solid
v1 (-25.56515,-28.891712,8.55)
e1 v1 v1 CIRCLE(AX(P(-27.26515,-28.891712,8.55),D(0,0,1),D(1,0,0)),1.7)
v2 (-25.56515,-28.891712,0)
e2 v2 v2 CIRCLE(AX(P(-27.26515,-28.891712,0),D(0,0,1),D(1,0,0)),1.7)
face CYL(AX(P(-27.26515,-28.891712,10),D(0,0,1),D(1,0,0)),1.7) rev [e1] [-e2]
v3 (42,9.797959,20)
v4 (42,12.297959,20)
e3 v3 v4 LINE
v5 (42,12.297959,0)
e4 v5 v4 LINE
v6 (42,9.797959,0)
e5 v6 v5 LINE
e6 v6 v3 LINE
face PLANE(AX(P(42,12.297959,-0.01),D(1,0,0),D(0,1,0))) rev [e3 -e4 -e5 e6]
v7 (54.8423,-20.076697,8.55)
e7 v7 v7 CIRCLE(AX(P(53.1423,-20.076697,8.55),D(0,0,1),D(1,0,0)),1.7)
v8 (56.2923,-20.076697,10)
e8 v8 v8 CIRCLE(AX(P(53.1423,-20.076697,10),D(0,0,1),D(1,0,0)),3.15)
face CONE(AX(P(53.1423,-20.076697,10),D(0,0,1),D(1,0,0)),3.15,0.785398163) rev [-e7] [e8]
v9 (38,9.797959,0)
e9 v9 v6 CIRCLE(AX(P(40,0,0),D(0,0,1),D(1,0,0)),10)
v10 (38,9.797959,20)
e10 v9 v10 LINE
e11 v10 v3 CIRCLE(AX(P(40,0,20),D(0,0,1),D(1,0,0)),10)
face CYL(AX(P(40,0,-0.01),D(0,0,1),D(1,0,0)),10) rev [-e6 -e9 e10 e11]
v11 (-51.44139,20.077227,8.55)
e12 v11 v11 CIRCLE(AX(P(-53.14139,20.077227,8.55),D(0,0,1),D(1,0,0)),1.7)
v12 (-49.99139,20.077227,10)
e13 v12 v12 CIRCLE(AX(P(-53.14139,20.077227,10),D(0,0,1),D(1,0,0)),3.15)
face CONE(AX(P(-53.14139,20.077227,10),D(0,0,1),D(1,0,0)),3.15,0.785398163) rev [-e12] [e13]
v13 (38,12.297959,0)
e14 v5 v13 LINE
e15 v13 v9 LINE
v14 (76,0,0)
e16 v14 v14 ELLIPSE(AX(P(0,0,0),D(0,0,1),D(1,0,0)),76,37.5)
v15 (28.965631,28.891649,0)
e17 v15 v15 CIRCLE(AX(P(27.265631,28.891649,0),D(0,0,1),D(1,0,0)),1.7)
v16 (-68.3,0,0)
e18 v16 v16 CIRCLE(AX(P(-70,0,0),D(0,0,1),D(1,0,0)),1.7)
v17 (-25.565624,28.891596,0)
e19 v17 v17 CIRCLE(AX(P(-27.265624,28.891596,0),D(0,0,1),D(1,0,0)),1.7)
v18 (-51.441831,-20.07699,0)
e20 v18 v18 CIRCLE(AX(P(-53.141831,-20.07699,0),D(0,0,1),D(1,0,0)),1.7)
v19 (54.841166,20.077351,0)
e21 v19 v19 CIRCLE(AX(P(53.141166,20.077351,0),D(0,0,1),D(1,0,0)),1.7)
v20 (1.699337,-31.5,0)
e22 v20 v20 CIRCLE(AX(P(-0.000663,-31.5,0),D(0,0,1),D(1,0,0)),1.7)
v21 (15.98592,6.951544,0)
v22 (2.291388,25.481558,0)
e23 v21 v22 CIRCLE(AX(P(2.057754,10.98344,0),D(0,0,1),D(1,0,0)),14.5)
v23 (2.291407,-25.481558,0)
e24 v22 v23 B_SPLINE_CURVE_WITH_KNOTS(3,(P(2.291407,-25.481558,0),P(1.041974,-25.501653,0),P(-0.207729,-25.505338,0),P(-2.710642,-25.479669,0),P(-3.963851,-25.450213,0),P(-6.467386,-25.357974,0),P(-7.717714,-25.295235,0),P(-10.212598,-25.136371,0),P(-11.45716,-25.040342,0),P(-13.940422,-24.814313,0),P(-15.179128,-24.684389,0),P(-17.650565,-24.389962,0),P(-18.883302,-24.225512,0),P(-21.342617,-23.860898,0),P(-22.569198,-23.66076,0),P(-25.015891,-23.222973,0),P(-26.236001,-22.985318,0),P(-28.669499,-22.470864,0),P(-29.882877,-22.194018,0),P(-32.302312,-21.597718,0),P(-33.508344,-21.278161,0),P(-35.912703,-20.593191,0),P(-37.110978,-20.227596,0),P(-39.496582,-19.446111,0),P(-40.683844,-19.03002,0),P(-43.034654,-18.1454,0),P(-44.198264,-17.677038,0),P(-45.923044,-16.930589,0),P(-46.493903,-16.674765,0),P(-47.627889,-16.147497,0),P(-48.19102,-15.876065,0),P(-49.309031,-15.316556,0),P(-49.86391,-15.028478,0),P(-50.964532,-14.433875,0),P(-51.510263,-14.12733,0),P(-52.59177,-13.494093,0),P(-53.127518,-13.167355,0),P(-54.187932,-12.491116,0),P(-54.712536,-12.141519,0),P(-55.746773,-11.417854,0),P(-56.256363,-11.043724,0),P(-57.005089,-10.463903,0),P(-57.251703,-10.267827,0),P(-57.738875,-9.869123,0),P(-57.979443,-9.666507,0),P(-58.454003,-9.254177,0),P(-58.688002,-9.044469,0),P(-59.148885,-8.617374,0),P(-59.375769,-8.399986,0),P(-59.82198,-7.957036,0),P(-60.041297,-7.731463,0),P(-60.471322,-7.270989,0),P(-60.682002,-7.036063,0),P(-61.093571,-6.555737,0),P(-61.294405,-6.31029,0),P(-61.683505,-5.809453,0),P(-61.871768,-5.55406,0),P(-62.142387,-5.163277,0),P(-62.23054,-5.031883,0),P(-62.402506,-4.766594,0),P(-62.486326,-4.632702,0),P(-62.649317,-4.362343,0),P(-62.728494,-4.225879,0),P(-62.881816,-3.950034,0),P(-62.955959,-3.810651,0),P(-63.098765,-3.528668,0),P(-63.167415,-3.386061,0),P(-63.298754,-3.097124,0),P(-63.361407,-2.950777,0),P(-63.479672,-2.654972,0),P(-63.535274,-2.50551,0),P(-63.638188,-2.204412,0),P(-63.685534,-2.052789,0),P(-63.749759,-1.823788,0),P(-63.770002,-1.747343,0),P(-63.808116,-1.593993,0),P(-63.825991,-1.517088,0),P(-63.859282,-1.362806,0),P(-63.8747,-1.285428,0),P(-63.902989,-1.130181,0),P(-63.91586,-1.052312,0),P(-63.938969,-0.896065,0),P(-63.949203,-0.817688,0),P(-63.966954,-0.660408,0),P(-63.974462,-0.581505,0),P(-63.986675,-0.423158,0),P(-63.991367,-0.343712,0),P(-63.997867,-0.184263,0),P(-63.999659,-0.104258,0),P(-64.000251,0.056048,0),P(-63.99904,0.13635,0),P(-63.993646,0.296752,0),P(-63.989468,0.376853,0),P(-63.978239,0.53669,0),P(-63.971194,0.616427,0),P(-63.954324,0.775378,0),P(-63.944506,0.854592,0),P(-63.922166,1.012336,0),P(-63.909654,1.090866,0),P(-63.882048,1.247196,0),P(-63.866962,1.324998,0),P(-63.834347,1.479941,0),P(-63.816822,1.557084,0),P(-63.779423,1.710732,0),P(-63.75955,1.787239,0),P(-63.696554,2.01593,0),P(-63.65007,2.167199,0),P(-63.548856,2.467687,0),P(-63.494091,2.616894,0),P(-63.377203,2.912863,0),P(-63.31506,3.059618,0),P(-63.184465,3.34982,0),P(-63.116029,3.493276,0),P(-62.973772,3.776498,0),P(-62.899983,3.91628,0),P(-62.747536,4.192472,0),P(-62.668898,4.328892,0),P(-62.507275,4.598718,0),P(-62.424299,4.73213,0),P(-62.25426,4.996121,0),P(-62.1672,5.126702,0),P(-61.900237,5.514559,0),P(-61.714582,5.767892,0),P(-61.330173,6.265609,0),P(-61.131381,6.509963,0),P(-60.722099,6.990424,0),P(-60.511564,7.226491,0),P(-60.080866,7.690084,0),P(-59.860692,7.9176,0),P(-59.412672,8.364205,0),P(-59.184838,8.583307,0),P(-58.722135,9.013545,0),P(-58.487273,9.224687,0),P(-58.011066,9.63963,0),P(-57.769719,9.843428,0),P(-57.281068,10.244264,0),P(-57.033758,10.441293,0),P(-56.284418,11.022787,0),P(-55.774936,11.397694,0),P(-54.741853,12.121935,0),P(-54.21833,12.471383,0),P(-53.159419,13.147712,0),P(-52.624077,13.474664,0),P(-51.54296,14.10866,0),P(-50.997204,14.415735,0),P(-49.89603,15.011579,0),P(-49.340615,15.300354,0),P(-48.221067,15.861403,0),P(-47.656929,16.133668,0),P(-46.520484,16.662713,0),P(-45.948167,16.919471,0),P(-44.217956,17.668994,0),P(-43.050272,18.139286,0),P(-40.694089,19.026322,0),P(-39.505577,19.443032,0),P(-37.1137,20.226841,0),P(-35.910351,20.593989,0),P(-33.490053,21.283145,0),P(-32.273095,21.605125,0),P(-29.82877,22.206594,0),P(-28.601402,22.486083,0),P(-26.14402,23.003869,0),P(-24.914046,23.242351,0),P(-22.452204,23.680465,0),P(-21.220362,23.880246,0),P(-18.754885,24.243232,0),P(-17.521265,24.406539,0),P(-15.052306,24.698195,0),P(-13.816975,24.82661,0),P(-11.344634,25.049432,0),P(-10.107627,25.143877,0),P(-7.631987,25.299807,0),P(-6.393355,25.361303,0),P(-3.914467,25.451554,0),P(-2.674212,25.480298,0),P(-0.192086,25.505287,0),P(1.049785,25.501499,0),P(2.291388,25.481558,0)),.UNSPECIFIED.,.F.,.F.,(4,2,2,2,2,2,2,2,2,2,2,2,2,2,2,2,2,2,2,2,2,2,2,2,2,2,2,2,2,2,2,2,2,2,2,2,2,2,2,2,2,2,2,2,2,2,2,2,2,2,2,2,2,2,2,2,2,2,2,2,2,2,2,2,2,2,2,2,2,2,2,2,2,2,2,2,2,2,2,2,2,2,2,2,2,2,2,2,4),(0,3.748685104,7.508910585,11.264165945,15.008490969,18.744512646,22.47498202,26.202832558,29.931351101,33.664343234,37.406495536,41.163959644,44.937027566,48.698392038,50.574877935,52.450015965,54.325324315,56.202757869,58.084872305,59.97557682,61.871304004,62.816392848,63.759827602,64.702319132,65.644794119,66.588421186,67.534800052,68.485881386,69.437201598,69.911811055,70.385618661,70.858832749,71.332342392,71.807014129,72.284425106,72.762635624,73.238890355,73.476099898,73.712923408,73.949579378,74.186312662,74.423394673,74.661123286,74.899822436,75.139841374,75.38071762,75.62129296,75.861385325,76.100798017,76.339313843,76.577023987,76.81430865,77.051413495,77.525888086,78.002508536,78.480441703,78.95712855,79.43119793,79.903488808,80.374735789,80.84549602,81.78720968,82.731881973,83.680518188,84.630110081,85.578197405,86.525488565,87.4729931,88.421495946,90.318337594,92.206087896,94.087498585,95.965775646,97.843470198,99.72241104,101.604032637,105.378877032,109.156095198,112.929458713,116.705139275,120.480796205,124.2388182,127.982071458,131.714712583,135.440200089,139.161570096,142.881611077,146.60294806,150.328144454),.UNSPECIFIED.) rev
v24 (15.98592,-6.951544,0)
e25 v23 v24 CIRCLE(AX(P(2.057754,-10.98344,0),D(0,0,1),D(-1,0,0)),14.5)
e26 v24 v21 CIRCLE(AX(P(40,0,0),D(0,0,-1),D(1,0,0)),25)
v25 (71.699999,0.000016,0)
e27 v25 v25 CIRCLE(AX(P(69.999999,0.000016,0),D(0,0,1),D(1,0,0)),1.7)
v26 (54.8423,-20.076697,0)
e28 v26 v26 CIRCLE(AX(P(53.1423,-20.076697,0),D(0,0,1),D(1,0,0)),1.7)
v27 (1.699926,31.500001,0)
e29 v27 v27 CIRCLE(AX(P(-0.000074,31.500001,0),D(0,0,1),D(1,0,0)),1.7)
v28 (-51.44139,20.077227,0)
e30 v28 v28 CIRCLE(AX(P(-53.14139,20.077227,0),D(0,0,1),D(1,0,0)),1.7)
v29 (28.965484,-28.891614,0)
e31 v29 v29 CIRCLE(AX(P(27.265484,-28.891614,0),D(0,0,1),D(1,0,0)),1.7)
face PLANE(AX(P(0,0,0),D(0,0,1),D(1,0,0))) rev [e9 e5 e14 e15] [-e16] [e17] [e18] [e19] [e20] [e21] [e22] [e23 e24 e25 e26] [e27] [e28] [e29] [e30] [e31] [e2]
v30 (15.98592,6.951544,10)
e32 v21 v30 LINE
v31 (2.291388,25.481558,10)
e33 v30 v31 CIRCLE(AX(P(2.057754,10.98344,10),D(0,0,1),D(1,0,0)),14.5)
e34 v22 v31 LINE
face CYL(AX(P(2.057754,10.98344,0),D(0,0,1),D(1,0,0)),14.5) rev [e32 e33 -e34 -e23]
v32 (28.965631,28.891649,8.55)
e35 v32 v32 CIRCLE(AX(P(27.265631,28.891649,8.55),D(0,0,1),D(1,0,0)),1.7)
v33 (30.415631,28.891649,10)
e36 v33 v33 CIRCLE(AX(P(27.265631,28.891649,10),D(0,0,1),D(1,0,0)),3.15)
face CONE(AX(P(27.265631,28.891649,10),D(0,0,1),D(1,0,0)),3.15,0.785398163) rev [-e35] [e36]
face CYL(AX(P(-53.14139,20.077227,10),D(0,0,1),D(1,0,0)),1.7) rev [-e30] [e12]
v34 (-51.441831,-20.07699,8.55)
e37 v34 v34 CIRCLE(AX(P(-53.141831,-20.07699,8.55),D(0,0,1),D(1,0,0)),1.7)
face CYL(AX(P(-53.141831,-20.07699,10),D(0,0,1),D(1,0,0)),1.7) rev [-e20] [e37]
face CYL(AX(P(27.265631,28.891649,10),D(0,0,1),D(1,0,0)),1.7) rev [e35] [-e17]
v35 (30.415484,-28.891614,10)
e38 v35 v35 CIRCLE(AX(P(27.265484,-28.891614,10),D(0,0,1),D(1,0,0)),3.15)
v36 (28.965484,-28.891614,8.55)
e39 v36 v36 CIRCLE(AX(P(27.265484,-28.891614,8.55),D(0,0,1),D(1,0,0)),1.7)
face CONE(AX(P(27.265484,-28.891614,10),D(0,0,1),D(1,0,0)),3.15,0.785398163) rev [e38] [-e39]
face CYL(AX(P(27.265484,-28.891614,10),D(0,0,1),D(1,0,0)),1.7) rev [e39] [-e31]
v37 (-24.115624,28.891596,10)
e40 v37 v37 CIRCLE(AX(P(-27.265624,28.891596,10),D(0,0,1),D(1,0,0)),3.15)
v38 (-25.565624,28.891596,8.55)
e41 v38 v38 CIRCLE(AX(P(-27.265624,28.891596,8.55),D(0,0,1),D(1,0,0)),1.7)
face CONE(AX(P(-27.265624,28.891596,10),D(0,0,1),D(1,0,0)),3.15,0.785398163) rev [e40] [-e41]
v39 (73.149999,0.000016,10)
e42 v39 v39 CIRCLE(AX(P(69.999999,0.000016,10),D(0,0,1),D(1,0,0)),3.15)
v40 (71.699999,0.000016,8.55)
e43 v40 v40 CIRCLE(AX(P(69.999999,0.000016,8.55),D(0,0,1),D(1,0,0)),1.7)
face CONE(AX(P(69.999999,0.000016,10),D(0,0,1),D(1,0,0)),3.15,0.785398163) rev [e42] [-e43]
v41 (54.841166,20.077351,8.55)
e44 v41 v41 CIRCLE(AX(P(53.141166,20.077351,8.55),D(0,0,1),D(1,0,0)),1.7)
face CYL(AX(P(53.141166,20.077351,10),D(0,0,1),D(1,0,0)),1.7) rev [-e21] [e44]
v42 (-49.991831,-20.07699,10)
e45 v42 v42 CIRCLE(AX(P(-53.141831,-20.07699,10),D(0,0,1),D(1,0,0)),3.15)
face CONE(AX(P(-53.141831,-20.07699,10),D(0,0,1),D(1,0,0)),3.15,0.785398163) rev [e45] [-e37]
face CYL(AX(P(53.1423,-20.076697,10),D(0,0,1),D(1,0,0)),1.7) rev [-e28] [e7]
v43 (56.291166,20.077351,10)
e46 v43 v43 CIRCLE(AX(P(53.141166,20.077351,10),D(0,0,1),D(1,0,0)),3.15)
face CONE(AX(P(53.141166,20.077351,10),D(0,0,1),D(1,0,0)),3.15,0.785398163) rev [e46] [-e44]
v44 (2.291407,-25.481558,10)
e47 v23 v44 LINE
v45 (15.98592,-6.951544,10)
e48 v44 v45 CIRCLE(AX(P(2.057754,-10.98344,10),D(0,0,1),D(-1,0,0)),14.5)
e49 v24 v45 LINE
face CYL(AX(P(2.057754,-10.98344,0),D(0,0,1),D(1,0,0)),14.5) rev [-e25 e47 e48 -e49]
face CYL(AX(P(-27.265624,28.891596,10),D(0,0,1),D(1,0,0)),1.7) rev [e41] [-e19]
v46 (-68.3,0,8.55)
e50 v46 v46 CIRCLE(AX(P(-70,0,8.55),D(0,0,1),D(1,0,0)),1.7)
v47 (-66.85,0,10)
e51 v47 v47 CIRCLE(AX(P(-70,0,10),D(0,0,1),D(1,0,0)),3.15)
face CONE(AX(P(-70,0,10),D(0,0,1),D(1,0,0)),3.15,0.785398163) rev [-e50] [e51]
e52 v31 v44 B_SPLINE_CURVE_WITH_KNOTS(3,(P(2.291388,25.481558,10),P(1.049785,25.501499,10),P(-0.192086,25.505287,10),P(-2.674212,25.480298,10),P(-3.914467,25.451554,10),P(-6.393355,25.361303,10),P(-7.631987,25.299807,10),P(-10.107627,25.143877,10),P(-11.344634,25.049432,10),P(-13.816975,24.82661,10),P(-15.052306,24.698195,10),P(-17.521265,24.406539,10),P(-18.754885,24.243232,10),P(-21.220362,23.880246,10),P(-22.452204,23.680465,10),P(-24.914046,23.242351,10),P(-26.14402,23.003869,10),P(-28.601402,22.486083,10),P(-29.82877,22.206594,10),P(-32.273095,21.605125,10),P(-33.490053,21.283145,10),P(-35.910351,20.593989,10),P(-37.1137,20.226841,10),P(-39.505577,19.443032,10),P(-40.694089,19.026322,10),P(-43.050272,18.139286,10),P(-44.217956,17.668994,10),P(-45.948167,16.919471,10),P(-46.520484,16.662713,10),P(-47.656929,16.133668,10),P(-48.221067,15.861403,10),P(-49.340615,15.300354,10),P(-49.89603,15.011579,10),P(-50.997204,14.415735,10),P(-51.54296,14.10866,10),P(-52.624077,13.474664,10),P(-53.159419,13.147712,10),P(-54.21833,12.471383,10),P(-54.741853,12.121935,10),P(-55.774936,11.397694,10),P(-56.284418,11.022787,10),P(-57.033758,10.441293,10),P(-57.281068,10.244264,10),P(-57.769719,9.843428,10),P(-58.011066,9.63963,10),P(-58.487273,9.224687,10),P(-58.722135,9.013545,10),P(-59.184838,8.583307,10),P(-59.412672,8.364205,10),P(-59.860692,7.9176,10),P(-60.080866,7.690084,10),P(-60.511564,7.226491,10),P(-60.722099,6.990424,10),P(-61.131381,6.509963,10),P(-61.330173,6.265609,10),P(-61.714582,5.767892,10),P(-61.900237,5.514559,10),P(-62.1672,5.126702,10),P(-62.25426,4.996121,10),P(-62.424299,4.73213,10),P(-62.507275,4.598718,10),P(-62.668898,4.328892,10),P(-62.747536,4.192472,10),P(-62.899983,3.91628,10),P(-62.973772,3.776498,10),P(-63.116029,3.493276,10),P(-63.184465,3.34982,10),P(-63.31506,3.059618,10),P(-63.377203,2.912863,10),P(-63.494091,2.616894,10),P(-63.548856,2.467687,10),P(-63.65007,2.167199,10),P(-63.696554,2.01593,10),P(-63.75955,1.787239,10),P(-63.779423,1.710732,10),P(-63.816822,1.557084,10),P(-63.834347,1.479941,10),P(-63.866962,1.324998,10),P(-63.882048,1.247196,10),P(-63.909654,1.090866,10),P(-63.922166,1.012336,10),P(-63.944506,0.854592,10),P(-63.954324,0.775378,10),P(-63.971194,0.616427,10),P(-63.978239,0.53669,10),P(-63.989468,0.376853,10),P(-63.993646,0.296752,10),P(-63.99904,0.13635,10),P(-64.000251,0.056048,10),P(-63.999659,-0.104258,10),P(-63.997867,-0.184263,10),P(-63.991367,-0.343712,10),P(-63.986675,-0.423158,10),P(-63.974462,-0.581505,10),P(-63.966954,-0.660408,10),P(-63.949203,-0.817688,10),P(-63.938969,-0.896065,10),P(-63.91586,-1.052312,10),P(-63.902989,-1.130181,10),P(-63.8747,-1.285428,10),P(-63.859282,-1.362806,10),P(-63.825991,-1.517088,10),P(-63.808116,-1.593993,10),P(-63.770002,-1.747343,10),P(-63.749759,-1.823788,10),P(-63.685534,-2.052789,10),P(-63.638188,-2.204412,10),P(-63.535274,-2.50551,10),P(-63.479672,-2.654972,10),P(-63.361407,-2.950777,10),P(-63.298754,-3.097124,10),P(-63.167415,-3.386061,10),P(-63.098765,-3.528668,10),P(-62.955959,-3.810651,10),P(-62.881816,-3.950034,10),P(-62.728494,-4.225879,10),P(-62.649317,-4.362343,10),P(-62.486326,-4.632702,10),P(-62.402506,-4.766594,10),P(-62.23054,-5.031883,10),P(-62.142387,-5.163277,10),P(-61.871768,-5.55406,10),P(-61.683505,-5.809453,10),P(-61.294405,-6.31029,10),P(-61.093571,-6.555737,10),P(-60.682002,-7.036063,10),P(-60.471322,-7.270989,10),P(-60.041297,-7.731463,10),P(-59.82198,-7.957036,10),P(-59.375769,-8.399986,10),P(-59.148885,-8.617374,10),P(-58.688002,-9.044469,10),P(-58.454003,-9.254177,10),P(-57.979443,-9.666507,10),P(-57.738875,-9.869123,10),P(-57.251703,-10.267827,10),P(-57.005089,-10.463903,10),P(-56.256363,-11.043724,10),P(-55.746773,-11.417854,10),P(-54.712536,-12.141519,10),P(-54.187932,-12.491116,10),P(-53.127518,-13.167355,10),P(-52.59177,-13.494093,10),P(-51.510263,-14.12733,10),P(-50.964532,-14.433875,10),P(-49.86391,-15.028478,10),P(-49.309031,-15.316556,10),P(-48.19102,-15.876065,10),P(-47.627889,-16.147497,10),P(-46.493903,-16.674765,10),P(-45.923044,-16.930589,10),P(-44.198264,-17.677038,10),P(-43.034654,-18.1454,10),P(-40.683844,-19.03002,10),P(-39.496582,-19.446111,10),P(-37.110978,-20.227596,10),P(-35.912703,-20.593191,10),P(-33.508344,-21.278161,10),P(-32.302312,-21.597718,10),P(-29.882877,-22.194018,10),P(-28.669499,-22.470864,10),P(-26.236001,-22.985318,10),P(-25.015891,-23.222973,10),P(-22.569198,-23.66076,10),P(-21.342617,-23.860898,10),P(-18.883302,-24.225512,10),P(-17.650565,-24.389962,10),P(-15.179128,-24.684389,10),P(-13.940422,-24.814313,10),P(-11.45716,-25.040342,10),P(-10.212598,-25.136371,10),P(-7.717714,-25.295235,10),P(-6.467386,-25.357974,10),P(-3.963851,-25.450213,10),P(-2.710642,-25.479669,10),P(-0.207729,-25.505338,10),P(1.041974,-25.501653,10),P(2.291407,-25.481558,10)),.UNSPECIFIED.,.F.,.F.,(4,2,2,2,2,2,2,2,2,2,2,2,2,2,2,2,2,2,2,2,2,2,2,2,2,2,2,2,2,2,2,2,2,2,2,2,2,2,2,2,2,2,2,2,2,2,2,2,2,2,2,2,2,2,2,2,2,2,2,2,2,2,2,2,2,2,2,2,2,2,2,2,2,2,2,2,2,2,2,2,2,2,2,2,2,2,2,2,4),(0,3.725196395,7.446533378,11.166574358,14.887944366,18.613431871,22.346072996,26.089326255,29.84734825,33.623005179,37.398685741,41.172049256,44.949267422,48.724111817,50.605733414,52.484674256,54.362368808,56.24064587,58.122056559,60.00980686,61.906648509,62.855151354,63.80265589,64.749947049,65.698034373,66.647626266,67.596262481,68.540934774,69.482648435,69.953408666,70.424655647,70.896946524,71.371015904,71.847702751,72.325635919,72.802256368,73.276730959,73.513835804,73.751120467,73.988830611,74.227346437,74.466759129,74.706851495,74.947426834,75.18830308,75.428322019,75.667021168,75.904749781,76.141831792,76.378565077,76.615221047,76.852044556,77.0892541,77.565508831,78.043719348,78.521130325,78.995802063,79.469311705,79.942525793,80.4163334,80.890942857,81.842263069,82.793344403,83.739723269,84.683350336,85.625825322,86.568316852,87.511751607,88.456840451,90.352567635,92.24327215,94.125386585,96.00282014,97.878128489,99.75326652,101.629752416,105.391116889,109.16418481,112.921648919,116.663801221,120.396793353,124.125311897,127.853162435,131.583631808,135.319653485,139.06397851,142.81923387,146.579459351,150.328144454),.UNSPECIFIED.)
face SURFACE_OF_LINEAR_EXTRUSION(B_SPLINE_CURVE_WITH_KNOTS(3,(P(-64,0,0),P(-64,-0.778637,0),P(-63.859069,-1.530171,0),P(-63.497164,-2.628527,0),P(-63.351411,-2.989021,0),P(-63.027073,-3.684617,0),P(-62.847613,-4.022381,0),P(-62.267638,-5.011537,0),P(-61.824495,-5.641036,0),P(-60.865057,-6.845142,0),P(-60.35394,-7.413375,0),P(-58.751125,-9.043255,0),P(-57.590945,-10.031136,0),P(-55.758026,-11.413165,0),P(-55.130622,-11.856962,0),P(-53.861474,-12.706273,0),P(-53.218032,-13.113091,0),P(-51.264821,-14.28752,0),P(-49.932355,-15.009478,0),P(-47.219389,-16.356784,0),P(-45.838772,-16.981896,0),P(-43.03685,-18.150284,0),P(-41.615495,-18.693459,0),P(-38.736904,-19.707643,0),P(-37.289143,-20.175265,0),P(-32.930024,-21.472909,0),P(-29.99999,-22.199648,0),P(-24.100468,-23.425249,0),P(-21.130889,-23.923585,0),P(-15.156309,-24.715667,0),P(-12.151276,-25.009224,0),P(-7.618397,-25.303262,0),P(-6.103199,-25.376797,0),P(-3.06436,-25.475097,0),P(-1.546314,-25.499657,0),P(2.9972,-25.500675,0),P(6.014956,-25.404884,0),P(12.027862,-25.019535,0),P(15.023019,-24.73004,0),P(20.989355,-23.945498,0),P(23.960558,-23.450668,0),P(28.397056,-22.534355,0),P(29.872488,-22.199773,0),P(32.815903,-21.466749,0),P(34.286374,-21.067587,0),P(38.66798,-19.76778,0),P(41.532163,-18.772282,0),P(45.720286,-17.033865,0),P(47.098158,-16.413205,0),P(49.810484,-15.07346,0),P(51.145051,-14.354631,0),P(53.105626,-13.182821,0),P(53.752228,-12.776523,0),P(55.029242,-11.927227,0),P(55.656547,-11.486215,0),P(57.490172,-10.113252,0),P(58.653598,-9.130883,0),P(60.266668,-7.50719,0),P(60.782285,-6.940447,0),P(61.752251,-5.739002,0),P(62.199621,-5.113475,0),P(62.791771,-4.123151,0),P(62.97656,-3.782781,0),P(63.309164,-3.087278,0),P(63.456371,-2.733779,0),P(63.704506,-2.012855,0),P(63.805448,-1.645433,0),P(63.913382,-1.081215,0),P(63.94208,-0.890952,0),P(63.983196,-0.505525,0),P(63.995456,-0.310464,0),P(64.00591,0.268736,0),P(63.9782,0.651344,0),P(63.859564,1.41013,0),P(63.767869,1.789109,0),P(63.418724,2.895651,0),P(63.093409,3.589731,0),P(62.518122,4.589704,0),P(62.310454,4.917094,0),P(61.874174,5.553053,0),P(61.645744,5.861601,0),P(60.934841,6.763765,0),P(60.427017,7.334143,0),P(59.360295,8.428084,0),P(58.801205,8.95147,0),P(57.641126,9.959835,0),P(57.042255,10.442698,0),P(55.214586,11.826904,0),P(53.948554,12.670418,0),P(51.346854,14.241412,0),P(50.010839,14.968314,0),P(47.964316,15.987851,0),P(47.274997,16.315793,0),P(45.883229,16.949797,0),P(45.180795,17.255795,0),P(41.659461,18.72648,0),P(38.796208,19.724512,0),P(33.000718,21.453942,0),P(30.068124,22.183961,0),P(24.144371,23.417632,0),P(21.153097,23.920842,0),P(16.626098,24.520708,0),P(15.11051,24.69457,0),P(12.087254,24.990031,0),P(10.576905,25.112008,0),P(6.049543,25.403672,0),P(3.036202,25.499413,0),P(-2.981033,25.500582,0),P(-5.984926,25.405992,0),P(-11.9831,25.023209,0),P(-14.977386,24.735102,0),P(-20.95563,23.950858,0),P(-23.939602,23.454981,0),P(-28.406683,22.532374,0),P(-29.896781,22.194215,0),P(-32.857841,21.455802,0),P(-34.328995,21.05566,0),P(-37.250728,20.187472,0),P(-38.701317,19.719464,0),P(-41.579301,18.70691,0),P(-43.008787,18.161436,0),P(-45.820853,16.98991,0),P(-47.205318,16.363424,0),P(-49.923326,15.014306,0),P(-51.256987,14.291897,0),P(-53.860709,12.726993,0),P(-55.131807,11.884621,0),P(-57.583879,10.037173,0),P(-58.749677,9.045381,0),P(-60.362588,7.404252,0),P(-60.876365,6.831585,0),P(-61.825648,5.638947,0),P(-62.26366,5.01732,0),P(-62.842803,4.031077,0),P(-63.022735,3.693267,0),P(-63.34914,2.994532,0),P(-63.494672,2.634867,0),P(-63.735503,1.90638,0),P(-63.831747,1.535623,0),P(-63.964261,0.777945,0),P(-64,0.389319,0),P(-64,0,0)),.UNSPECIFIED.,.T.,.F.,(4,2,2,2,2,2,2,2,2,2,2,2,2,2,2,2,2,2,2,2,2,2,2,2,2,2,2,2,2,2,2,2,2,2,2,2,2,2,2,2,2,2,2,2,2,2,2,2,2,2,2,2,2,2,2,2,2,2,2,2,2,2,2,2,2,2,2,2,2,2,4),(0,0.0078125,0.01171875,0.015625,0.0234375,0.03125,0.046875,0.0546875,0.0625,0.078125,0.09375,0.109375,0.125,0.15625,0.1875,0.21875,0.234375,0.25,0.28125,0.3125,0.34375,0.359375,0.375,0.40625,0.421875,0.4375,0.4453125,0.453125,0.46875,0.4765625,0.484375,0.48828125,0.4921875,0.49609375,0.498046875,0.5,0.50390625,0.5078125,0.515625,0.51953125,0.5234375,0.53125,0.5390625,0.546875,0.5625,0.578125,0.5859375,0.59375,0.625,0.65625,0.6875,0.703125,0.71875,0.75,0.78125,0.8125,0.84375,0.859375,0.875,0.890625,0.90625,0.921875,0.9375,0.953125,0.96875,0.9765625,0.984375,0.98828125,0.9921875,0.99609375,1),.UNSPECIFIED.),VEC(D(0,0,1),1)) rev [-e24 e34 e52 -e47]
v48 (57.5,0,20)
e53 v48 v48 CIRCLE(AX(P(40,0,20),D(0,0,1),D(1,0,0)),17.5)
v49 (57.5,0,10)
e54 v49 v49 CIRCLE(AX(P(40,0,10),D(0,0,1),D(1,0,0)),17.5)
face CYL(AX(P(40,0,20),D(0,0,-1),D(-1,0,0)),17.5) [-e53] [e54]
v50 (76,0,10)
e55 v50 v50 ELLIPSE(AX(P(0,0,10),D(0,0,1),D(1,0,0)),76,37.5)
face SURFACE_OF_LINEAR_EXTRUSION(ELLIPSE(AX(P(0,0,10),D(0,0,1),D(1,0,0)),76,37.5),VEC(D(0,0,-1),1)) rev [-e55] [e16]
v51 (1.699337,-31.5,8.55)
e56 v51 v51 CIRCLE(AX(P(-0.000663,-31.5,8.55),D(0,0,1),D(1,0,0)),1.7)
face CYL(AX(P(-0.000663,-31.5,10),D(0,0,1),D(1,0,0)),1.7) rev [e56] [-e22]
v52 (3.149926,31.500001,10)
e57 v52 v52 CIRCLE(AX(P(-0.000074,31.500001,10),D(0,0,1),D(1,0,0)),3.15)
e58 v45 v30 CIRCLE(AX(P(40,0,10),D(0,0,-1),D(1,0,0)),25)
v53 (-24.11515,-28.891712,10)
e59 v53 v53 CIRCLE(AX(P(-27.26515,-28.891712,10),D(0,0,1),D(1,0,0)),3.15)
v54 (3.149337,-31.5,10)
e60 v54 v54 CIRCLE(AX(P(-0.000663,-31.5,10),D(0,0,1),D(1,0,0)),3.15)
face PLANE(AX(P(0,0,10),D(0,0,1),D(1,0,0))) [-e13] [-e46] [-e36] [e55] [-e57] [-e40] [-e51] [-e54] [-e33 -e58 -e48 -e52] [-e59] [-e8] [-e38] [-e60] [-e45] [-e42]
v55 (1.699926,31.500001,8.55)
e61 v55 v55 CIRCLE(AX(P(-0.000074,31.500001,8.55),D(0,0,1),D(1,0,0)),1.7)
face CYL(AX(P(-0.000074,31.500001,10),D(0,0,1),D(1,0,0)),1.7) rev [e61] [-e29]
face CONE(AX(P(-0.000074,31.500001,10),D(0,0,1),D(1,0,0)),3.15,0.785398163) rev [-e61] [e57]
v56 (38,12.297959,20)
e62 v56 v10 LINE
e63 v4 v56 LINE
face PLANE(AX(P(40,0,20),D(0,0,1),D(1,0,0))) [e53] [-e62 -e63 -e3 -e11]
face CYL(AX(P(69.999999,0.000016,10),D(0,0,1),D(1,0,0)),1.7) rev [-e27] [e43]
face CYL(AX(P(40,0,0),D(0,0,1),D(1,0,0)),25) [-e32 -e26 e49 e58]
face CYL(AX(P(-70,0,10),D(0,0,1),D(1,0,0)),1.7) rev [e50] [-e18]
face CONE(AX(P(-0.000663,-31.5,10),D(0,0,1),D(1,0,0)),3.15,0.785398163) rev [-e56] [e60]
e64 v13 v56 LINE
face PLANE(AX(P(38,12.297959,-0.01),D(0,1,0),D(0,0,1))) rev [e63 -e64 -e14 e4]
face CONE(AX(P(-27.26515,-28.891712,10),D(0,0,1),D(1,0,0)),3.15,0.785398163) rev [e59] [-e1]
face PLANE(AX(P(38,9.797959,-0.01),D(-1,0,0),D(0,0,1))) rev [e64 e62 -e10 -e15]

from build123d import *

# Parameters (mm, degrees)
SKETCH1_RX                                      = 76
SKETCH1_RY                                      = 37.5
EXTRUDE1_DEPTH                                  = 10
SKETCH2_R                                       = 17.5
EXTRUDE2_DEPTH                                  = 10
EXTRUDE3_DEPTH                                  = 86.336100216
EXTRUDE4_DEPTH                                  = 88.076116282
CSK_FOR_M3_FLAT_HEAD_MACHINE_SCREW1_D           = 3.4
CSK_FOR_M3_FLAT_HEAD_MACHINE_SCREW1_CSINK_D     = 6.3
CSK_FOR_M3_FLAT_HEAD_MACHINE_SCREW1_CSINK_ANGLE = 90


# Read off the part's stored shape, not the designer's step: CrvPattern1
with BuildPart() as part:
    # Sketch1 → Extrude1 (new body)
    with BuildSketch(Plane.XY):
        with Locations((0, 0)):
            Ellipse(SKETCH1_RX, SKETCH1_RY)
    extrude(amount=EXTRUDE1_DEPTH)

    # Sketch2 → Extrude2 (add)
    with BuildSketch(Plane.XY.offset(10)):
        with Locations((40, 0)):
            Circle(SKETCH2_R)
    extrude(amount=EXTRUDE2_DEPTH)

    # Sketch3 → Extrude3 (cut, through all)
    with BuildSketch(Plane.XY.offset(10)):
        with BuildLine():
            ThreePointArc((15.98592019, 6.951544496), (15, 3.7e-08), (15.98592017, -6.951544426))
            ThreePointArc((15.98592017, -6.951544426), (13.718784315, -19.601466006), (2.291407331, -25.481557521))
            add(Edge.make_bspline(
                [(2.29138759, 25.481557951), (1.536487696, 25.493722982), (0.781887509, 25.499850821), (-2.981033191, 25.500581652), (-5.984925899, 25.40599226), (-11.983100173, 25.023209453), (-14.977386018, 24.73510222), (-20.95563043, 23.950858112), (-23.939601905, 23.454981247), (-28.406683292, 22.532373907), (-29.89678094, 22.194215189), (-32.857840607, 21.45580248), (-34.328995491, 21.055659759), (-37.25072809, 20.187471783), (-38.70131721, 19.719464163), (-41.57930104, 18.706909763), (-43.008786731, 18.161435894), (-45.820852611, 16.989909653), (-47.205317632, 16.36342386), (-49.923326001, 15.014306389), (-51.256986979, 14.291896812), (-53.860708588, 12.726993001), (-55.131807019, 11.884621283), (-57.583878718, 10.037173385), (-58.749677002, 9.04538051), (-60.362588222, 7.404251705), (-60.876365057, 6.831585201), (-61.825648091, 5.638947207), (-62.26365963, 5.017320455), (-62.842802577, 4.031076714), (-63.022734978, 3.693267438), (-63.349140243, 2.994531599), (-63.494672168, 2.634866816), (-63.735502964, 1.90638021), (-63.831747251, 1.535622764), (-63.964260682, 0.7779445), (-64, 0.389318673), (-64, 0), (-64, -0.778637345), (-63.859069102, -1.530171415), (-63.497163716, -2.628527212), (-63.351411012, -2.989020671), (-63.027073259, -3.684617278), (-62.847612543, -4.022381244), (-62.267637767, -5.011537226), (-61.824495344, -5.641036298), (-60.865057448, -6.845142379), (-60.353939893, -7.413375257), (-58.75112499, -9.043254515), (-57.59094473, -10.031136374), (-55.758025791, -11.413165279), (-55.130622026, -11.856962148), (-53.861474171, -12.706272639), (-53.218031918, -13.113090985), (-51.264821291, -14.287519606), (-49.932355056, -15.009477583), (-47.219389061, -16.356783508), (-45.83877221, -16.981895954), (-43.036850002, -18.150283887), (-41.615494943, -18.693459408), (-38.73690368, -19.707642558), (-37.289143264, -20.175264836), (-32.930023695, -21.47290858), (-29.999989675, -22.199648454), (-24.100467658, -23.425248805), (-21.130888818, -23.923584596), (-15.156309454, -24.715666618), (-12.151276192, -25.009223767), (-7.618397002, -25.30326182), (-6.103199372, -25.376797121), (-3.064360152, -25.475096866), (-1.546314468, -25.499657235), (0.743333331, -25.500170046), (1.517739245, -25.494026052), (2.291407331, -25.481557521)],
                knots=[0.74216518, 0.74216518, 0.74216518, 0.74216518, 0.75, 0.75, 0.78125, 0.78125, 0.8125, 0.8125, 0.84375, 0.84375, 0.859375, 0.859375, 0.875, 0.875, 0.890625, 0.890625, 0.90625, 0.90625, 0.921875, 0.921875, 0.9375, 0.9375, 0.953125, 0.953125, 0.96875, 0.96875, 0.9765625, 0.9765625, 0.984375, 0.984375, 0.98828125, 0.98828125, 0.9921875, 0.9921875, 0.99609375, 0.99609375, 1, 1, 1, 1.0078125, 1.0078125, 1.01171875, 1.01171875, 1.015625, 1.015625, 1.0234375, 1.0234375, 1.03125, 1.03125, 1.046875, 1.046875, 1.0546875, 1.0546875, 1.0625, 1.0625, 1.078125, 1.078125, 1.09375, 1.09375, 1.109375, 1.109375, 1.125, 1.125, 1.15625, 1.15625, 1.1875, 1.1875, 1.21875, 1.21875, 1.234375, 1.234375, 1.25, 1.25, 1.257997075, 1.257997075, 1.257997075, 1.257997075], degree=3))
            ThreePointArc((2.29138759, 25.481557951), (13.718778483, 19.601474052), (15.98592019, 6.951544496))
        make_face()
    extrude(amount=-EXTRUDE3_DEPTH, mode=Mode.SUBTRACT)

    # Sketch4 → Extrude4 (cut, through all)
    with BuildSketch(Plane.XY.offset(20)):
        with BuildLine():
            Line((38, 9.797958971), (38, 12.297958971))
            Line((38, 12.297958971), (42, 12.297958971))
            Line((42, 12.297958971), (42, 9.797958971))
            ThreePointArc((42, 9.797958971), (40, -10), (38, 9.797958971))
        make_face()
    extrude(amount=-EXTRUDE4_DEPTH, mode=Mode.SUBTRACT)

    # CSK for M3 Flat Head Machine Screw1 (through all)
    with Locations(Plane.XY.offset(10)):
        with Locations((-70, 0)):
            CounterSinkHole(CSK_FOR_M3_FLAT_HEAD_MACHINE_SCREW1_D / 2, CSK_FOR_M3_FLAT_HEAD_MACHINE_SCREW1_CSINK_D / 2, counter_sink_angle=CSK_FOR_M3_FLAT_HEAD_MACHINE_SCREW1_CSINK_ANGLE)

    # CrvPattern1 outline → CrvPattern1 (revolve, cut)
    with BuildSketch(Plane(origin=(-53.141830984, -20.07698957, 0), x_dir=(1, 0, 0), z_dir=(0, -1, 0))):
        Polygon((0, 0), (1.7, 0), (1.7, 8.55), (3.15, 10), (0, 10), align=None)
    revolve(axis=Axis((-53.141830984, -20.07698957, 0), (0, 0, 1)), mode=Mode.SUBTRACT)

    # CrvPattern1 2 outline → CrvPattern1 2 (revolve, cut)
    with BuildSketch(Plane(origin=(-27.265149877, -28.891712225, 0), x_dir=(1, 0, 0), z_dir=(0, -1, 0))):
        Polygon((0, 0), (1.7, 0), (1.7, 8.55), (3.15, 10), (0, 10), align=None)
    revolve(axis=Axis((-27.265149877, -28.891712225, 0), (0, 0, 1)), mode=Mode.SUBTRACT)

    # CrvPattern1 3 outline → CrvPattern1 3 (revolve, cut)
    with BuildSketch(Plane(origin=(-0.000662841, -31.49999966, 0), x_dir=(1, 0, 0), z_dir=(0, -1, 0))):
        Polygon((0, 0), (1.7, 0), (1.7, 8.55), (3.15, 10), (0, 10), align=None)
    revolve(axis=Axis((-0.000662841, -31.49999966, 0), (0, 0, 1)), mode=Mode.SUBTRACT)

    # CrvPattern1 4 outline → CrvPattern1 4 (revolve, cut)
    with BuildSketch(Plane(origin=(27.26548431, -28.891613547, 0), x_dir=(1, 0, 0), z_dir=(0, -1, 0))):
        Polygon((0, 0), (1.7, 0), (1.7, 8.55), (3.15, 10), (0, 10), align=None)
    revolve(axis=Axis((27.26548431, -28.891613547, 0), (0, 0, 1)), mode=Mode.SUBTRACT)

    # CrvPattern1 5 outline → CrvPattern1 5 (revolve, cut)
    with BuildSketch(Plane(origin=(53.142300477, -20.076697483, 0), x_dir=(1, 0, 0), z_dir=(0, -1, 0))):
        Polygon((0, 0), (1.7, 0), (1.7, 8.55), (3.15, 10), (0, 10), align=None)
    revolve(axis=Axis((53.142300477, -20.076697483, 0), (0, 0, 1)), mode=Mode.SUBTRACT)

    # CrvPattern1 6 outline → CrvPattern1 6 (revolve, cut)
    with BuildSketch(Plane(origin=(69.999999136, 1.6117e-05, 0), x_dir=(1, 0, 0), z_dir=(0, -1, 0))):
        Polygon((0, 0), (1.7, 0), (1.7, 8.55), (3.15, 10), (0, 10), align=None)
    revolve(axis=Axis((69.999999136, 1.6117e-05, 0), (0, 0, 1)), mode=Mode.SUBTRACT)

    # CrvPattern1 7 outline → CrvPattern1 7 (revolve, cut)
    with BuildSketch(Plane(origin=(53.141166185, 20.07735132, 0), x_dir=(1, 0, 0), z_dir=(0, -1, 0))):
        Polygon((0, 0), (1.7, 0), (1.7, 8.55), (3.15, 10), (0, 10), align=None)
    revolve(axis=Axis((53.141166185, 20.07735132, 0), (0, 0, 1)), mode=Mode.SUBTRACT)

    # CrvPattern1 8 outline → CrvPattern1 8 (revolve, cut)
    with BuildSketch(Plane(origin=(27.265630656, 28.891648613, 0), x_dir=(1, 0, 0), z_dir=(0, -1, 0))):
        Polygon((0, 0), (1.7, 0), (1.7, 8.55), (3.15, 10), (0, 10), align=None)
    revolve(axis=Axis((27.265630656, 28.891648613, 0), (0, 0, 1)), mode=Mode.SUBTRACT)

    # CrvPattern1 9 outline → CrvPattern1 9 (revolve, cut)
    with BuildSketch(Plane(origin=(-7.3558e-05, 31.50000088, 0), x_dir=(1, 0, 0), z_dir=(0, -1, 0))):
        Polygon((0, 0), (1.7, 0), (1.7, 8.55), (3.15, 10), (0, 10), align=None)
    revolve(axis=Axis((-7.3558e-05, 31.50000088, 0), (0, 0, 1)), mode=Mode.SUBTRACT)

    # CrvPattern1 10 outline → CrvPattern1 10 (revolve, cut)
    with BuildSketch(Plane(origin=(-27.26562412, 28.891596465, 0), x_dir=(1, 0, 0), z_dir=(0, -1, 0))):
        Polygon((0, 0), (1.7, 0), (1.7, 8.55), (3.15, 10), (0, 10), align=None)
    revolve(axis=Axis((-27.26562412, 28.891596465, 0), (0, 0, 1)), mode=Mode.SUBTRACT)

    # CrvPattern1 11 outline → CrvPattern1 11 (revolve, cut)
    with BuildSketch(Plane(origin=(-53.141389818, 20.077226862, 0), x_dir=(1, 0, 0), z_dir=(0, -1, 0))):
        Polygon((0, 0), (1.7, 0), (1.7, 8.55), (3.15, 10), (0, 10), align=None)
    revolve(axis=Axis((-53.141389818, 20.077226862, 0), (0, 0, 1)), mode=Mode.SUBTRACT)


solid = part.part
